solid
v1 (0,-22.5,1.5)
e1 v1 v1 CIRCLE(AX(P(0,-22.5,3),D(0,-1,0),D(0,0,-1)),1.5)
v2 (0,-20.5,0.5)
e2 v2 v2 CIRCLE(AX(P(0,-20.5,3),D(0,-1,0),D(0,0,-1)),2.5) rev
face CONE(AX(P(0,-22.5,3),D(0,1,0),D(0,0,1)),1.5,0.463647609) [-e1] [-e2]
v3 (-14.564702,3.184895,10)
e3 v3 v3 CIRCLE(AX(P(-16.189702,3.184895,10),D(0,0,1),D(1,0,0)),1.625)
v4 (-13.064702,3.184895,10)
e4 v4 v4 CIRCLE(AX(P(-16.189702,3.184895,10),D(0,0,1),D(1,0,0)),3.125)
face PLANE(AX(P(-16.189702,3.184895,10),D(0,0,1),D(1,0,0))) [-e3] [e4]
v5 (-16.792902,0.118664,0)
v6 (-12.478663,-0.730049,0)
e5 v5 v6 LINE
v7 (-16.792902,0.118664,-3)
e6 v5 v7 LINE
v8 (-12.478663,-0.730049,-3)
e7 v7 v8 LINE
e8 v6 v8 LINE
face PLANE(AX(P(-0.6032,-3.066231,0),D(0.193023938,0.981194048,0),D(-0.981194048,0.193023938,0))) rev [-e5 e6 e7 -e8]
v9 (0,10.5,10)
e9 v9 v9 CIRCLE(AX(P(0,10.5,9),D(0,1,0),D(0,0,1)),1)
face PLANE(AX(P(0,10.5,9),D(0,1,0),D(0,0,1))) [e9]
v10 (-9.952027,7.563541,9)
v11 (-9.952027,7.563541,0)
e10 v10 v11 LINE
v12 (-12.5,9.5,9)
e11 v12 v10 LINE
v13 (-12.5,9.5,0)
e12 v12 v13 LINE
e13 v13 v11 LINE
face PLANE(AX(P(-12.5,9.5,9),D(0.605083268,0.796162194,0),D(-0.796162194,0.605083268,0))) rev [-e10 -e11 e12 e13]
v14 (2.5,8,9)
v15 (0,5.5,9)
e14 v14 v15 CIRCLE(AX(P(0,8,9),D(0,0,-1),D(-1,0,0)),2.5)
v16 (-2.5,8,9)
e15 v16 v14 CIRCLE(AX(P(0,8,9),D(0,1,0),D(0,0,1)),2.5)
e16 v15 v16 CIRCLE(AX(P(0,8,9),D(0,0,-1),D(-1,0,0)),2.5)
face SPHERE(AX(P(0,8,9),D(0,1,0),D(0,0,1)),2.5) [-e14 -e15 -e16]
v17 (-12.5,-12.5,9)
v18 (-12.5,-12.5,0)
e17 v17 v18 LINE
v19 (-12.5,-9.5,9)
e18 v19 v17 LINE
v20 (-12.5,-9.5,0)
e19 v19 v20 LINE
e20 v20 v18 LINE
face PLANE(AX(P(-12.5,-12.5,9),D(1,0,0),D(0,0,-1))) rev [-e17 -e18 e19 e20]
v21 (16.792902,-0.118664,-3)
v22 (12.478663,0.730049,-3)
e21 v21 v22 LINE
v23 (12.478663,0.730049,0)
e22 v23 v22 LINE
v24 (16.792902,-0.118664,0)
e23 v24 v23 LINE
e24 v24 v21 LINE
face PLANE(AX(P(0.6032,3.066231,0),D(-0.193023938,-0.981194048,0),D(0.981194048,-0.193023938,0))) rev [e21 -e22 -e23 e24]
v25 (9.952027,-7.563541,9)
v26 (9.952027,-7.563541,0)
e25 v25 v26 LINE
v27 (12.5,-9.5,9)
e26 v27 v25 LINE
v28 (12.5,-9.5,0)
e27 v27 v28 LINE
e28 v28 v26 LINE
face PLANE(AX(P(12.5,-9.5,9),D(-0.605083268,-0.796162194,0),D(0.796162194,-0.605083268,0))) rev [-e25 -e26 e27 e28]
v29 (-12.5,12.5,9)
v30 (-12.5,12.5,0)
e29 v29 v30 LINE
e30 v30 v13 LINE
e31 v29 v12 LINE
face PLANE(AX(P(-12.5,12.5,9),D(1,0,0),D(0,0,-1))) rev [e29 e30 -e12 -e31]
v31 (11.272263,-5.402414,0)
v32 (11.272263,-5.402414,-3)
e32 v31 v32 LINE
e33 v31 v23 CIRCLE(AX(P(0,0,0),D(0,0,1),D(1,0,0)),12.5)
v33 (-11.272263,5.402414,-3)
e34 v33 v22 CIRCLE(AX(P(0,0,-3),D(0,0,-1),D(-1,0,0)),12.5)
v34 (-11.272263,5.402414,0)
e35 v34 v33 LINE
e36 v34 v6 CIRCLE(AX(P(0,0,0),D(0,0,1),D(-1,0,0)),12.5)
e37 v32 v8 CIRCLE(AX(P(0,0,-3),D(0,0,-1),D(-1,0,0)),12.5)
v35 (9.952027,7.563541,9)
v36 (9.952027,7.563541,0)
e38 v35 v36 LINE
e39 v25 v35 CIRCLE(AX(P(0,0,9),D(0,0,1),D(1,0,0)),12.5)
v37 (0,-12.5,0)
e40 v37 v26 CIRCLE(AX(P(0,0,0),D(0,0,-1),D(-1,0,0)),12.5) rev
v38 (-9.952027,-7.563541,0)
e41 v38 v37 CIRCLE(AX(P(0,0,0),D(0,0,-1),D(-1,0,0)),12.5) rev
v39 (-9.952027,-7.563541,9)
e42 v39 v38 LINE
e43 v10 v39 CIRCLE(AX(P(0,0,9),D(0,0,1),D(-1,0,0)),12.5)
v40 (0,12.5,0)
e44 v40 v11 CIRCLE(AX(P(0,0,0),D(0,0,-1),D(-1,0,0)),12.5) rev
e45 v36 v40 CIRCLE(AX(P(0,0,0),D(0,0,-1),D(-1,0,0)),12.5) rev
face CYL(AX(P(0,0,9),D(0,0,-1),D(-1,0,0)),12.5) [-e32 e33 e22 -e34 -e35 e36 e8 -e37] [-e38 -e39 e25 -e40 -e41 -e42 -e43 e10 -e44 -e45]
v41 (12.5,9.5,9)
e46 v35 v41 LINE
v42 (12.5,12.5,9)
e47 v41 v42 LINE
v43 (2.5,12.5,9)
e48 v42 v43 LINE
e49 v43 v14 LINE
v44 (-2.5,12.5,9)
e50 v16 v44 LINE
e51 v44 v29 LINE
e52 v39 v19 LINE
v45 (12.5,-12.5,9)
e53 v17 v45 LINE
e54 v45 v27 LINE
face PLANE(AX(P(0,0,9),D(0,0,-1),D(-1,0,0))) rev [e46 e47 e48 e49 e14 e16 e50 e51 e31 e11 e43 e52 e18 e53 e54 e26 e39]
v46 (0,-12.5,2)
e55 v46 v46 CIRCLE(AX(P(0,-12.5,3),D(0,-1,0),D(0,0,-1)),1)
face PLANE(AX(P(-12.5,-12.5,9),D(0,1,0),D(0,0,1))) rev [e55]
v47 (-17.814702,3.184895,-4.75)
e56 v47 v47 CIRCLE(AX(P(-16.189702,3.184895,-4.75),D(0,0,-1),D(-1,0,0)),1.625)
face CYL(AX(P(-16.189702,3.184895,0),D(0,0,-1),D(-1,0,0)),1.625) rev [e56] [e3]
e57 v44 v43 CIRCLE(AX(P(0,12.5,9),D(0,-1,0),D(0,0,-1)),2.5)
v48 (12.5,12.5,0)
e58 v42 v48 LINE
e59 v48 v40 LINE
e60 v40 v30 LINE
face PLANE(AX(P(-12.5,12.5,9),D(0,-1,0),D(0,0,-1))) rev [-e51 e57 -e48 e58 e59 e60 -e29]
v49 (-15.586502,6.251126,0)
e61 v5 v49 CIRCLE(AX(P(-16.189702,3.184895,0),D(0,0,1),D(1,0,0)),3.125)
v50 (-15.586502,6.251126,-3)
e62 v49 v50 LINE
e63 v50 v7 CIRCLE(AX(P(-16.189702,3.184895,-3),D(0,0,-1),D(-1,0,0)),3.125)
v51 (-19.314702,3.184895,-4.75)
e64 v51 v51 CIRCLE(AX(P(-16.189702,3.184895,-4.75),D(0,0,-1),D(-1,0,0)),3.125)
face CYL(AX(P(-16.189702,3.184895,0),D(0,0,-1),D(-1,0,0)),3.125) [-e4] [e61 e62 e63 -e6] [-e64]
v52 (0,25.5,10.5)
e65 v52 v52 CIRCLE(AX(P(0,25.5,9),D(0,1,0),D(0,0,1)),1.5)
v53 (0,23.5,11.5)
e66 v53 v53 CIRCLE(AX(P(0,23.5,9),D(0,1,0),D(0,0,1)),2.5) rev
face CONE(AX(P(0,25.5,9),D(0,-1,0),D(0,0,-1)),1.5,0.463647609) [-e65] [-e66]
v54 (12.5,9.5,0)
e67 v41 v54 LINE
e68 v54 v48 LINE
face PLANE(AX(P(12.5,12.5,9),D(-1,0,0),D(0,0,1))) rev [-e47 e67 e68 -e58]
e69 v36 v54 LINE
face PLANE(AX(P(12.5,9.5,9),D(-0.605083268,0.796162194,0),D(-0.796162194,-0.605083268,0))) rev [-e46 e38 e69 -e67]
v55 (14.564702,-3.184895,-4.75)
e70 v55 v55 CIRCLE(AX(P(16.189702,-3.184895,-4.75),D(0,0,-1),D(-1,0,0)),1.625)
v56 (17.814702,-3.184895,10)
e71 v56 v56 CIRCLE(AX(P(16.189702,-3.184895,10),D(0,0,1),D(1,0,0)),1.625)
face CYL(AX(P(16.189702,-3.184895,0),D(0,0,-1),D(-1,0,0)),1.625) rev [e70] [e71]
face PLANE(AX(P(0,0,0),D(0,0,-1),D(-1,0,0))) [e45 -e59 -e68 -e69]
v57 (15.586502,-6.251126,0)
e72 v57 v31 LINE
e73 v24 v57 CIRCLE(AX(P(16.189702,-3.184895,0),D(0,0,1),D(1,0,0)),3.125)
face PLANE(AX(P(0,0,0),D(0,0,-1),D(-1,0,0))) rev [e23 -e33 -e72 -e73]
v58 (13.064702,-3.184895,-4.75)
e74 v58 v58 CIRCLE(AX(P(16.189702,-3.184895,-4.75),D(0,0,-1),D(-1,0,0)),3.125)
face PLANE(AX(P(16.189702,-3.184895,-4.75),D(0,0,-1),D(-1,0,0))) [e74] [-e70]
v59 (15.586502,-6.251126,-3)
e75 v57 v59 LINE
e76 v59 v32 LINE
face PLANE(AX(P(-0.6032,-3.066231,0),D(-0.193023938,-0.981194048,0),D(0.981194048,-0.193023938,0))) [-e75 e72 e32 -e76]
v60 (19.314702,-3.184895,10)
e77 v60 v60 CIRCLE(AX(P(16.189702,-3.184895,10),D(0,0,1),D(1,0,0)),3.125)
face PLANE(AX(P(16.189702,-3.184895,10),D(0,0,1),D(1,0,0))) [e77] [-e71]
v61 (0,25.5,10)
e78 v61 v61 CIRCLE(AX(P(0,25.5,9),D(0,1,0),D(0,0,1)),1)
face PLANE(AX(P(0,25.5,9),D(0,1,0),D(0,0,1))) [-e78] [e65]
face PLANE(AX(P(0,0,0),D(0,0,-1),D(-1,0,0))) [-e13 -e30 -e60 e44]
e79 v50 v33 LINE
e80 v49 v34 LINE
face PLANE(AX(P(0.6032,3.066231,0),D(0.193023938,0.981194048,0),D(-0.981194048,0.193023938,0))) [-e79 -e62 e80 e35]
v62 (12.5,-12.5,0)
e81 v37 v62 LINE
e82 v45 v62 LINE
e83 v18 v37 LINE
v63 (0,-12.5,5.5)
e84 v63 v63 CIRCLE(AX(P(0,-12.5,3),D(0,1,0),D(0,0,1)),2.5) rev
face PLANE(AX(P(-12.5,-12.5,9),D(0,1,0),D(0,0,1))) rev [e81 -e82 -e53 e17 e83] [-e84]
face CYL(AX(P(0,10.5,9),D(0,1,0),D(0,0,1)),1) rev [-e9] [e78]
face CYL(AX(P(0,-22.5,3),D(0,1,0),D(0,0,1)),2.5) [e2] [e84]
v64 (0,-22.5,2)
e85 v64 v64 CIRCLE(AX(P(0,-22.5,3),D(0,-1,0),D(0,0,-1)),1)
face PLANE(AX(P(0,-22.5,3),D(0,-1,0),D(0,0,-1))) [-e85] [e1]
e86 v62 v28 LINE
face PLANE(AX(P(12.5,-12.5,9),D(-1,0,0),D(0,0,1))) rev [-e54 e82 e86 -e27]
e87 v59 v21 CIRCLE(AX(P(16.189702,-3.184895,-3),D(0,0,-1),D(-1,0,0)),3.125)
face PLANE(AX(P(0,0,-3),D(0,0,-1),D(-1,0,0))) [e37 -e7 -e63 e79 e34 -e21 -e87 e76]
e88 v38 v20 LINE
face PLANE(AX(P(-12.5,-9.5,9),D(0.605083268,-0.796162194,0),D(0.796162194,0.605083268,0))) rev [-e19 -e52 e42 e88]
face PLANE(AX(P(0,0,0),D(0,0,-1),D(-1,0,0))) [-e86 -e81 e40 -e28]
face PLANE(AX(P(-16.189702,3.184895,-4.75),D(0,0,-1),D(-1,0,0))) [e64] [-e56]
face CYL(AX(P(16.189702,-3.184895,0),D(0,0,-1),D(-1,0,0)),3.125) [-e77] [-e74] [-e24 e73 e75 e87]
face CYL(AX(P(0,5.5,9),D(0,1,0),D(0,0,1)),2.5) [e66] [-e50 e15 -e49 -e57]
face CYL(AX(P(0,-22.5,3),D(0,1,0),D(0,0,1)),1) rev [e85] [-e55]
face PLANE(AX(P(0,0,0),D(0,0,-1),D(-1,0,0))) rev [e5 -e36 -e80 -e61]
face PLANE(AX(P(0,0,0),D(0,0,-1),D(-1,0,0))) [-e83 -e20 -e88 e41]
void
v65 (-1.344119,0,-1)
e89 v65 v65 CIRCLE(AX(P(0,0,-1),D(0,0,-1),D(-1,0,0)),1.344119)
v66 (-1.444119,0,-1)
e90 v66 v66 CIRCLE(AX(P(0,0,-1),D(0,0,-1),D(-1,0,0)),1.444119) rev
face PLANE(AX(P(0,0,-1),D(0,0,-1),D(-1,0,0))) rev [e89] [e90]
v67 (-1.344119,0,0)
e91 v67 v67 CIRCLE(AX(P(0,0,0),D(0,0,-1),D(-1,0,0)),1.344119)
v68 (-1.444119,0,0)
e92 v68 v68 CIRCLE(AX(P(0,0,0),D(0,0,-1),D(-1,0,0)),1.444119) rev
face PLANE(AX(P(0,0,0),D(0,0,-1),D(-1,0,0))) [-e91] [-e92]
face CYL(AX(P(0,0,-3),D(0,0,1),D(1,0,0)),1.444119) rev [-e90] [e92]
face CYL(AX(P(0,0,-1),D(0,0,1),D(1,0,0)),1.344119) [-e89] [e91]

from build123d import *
from OCP.BRepFilletAPI import BRepFilletAPI_MakeChamfer
from build123d.topology import SkipClean

# Parameters (mm, degrees)
SALIENTE_EXTRUIR1_DEPTH      = 9
CROQUIS3_R                   = 1.344119186
SALIENTE_EXTRUIR2_DEPTH      = 1
CROQUIS4_R                   = 12.5
CROQUIS4_R_2                 = 1.444119186
SALIENTE_EXTRUIR3_DEPTH      = 3
CROQUIS5_R                   = 1.444119186
SALIENTE_EXTRUIR4_DEPTH      = 2
SALIENTE_EXTRUIR5_START      = -3
CROQUIS6_R                   = 1.625
SALIENTE_EXTRUIR5_DEPTH      = 3
CROQUIS7_R                   = 3.125
CROQUIS7_R_2                 = 1.625
SALIENTE_EXTRUIR6_DEPTH      = 1.75
CROQUIS8_R                   = 3.125
CROQUIS8_R_2                 = 1.625
SALIENTE_EXTRUIR7_DEPTH      = 10
SALIENTE_EXTRUIR8_DEPTH      = 13
SALIENTE_EXTRUIR8_DEPTH_BACK = 7
CROQUIS9_R                   = 2.5
REDONDEO1_R                  = 2.5
CROQUIS11_R                  = 2.5
CROQUIS11_R_2                = 1
SALIENTE_EXTRUIR9_DEPTH      = 10
CHAFL_N1_SIZE                = 2
CHAFL_N1_SIZE2               = 1
CROQUIS10_R                  = 1
CORTAR_EXTRUIR1_DEPTH        = 15


with BuildPart() as part:
    # Croquis2 → Saliente-Extruir1 (new body)
    with BuildSketch(Plane.XY):
        with BuildLine():
            Line((-12.5, 12.5), (12.5, 12.5))
            Line((12.5, 12.5), (12.5, 9.5))
            Line((12.5, 9.5), (9.952027427, 7.563540844))
            ThreePointArc((9.952027427, 7.563540844), (12.5, 0), (9.952027427, -7.563540844))
            Line((9.952027427, -7.563540844), (12.5, -9.5))
            Line((12.5, -9.5), (12.5, -12.5))
            Line((12.5, -12.5), (-12.5, -12.5))
            Line((-12.5, -12.5), (-12.5, -9.5))
            Line((-12.5, -9.5), (-9.952027427, -7.563540844))
            ThreePointArc((-9.952027427, -7.563540844), (-12.5, 0), (-9.952027427, 7.563540844))
            Line((-9.952027427, 7.563540844), (-12.5, 9.5))
            Line((-12.5, 9.5), (-12.5, 12.5))
        make_face()
    extrude(amount=SALIENTE_EXTRUIR1_DEPTH)

    # Croquis3 → Saliente-Extruir2 (add)
    with BuildSketch(Plane(origin=(0, 0, 0), x_dir=(-1, 0, 0), z_dir=(0, 0, -1))):
        Circle(CROQUIS3_R)
    extrude(amount=SALIENTE_EXTRUIR2_DEPTH)



with BuildPart() as body_2:
    # Croquis4 → Saliente-Extruir3 (new body)
    with BuildSketch(Plane(origin=(0, 0, 0), x_dir=(-1, 0, 0), z_dir=(0, 0, -1))):
        Circle(CROQUIS4_R)
        Circle(CROQUIS4_R_2, mode=Mode.SUBTRACT)
    extrude(amount=SALIENTE_EXTRUIR3_DEPTH)

    # Croquis5 → Saliente-Extruir4 (add)
    with BuildSketch(Plane(origin=(0, 0, -3), x_dir=(-1, 0, 0), z_dir=(0, 0, -1))):
        Circle(CROQUIS5_R)
    extrude(amount=-SALIENTE_EXTRUIR4_DEPTH)

    # Croquis6 → Saliente-Extruir5 (add)
    # profile 1 of 2: a face of its own
    with BuildSketch(Plane(origin=(0, 0, -3), x_dir=(-1, 0, 0), z_dir=(0, 0, -1)).offset(SALIENTE_EXTRUIR5_START)):
        with BuildLine():
            Line((-12.478662951, 0.73004859), (-16.792901594, -0.118663584))
            ThreePointArc((-16.792901594, -0.118663584), (-19.255933186, -3.788094791), (-15.586501979, -6.251126382))
            Line((-15.586501979, -6.251126382), (-11.272263337, -5.402414208))
            ThreePointArc((-11.272263337, -5.402414208), (-12.264925596, -2.41279923), (-12.478662951, 0.73004859))
        make_face()
        with Locations((-16.189701787, -3.184894983)):
            Circle(CROQUIS6_R, mode=Mode.SUBTRACT)
    # profile 2 of 2: a face of its own
    with BuildSketch(Plane(origin=(0, 0, -3), x_dir=(-1, 0, 0), z_dir=(0, 0, -1)).offset(SALIENTE_EXTRUIR5_START)):
        with BuildLine():
            Line((15.586501979, 6.251126382), (11.272263337, 5.402414208))
            ThreePointArc((11.272263337, 5.402414208), (12.264925596, 2.41279923), (12.478662951, -0.73004859))
            Line((12.478662951, -0.73004859), (16.792901594, 0.118663584))
            ThreePointArc((16.792901594, 0.118663584), (19.255933186, 3.788094791), (15.586501979, 6.251126382))
        make_face()
        with Locations((16.189701787, 3.184894983)):
            Circle(CROQUIS6_R, mode=Mode.SUBTRACT)
    extrude(amount=SALIENTE_EXTRUIR5_DEPTH)

    # Croquis7 → Saliente-Extruir6 (add)
    # profile 1 of 2: a face of its own
    with BuildSketch(Plane(origin=(0, 0, -3), x_dir=(-1, 0, 0), z_dir=(0, 0, -1))):
        with Locations((-16.189701787, -3.184894983)):
            Circle(CROQUIS7_R)
        with Locations((-16.189701787, -3.184894983)):
            Circle(CROQUIS7_R_2, mode=Mode.SUBTRACT)
    # profile 2 of 2: a face of its own
    with BuildSketch(Plane(origin=(0, 0, -3), x_dir=(-1, 0, 0), z_dir=(0, 0, -1))):
        with Locations((16.189701787, 3.184894983)):
            Circle(CROQUIS7_R)
        with Locations((16.189701787, 3.184894983)):
            Circle(CROQUIS7_R_2, mode=Mode.SUBTRACT)
    extrude(amount=SALIENTE_EXTRUIR6_DEPTH)

    # Croquis8 → Saliente-Extruir7 (add)
    # profile 1 of 2: a face of its own
    with SkipClean():  # the faces are left unmerged after this step: merging them gives an invalid solid
        with BuildSketch(Plane.XY):
            with Locations(Location((-16.189701787, 3.184894983, 0), (0, 0, 180))):
                Circle(CROQUIS8_R)
            with Locations(Location((-16.189701787, 3.184894983, 0), (0, 0, 180))):
                Circle(CROQUIS8_R_2, mode=Mode.SUBTRACT)
        # profile 2 of 2: a face of its own
        with BuildSketch(Plane.XY):
            with Locations(Location((16.189701787, -3.184894983, 0), (0, 0, 180))):
                Circle(CROQUIS8_R)
            with Locations(Location((16.189701787, -3.184894983, 0), (0, 0, 180))):
                Circle(CROQUIS8_R_2, mode=Mode.SUBTRACT)
        extrude(amount=SALIENTE_EXTRUIR7_DEPTH)


with BuildPart() as part_1:
    add(part.part)

    add(body_2.part)  # Saliente-Extruir8 merges body 2
    # Croquis9 → Saliente-Extruir8 (add, two sides: drawn at the far end of the back side and taken through both)
    with BuildSketch(Plane(origin=(0, 12.5, 0), x_dir=(1, 0, 0), z_dir=(0, 1, 0)).offset(-SALIENTE_EXTRUIR8_DEPTH_BACK)):
        with Locations(Location((0, -9, 0), (0, 0, 270))):
            Circle(CROQUIS9_R)
    extrude(amount=SALIENTE_EXTRUIR8_DEPTH + SALIENTE_EXTRUIR8_DEPTH_BACK)

    # Redondeo1
    redondeo1_edges = [part_1.edges().sort_by_distance(p)[0] for p in [
        (1.767766953, 5.5, 10.767766953),
    ]]
    fillet(redondeo1_edges, radius=REDONDEO1_R - 0.0001)  # a hair under: the kernel refuses the full size

    # Croquis11 → Saliente-Extruir9 (add)
    with BuildSketch(Plane.XZ.offset(12.5)):
        with Locations(Location((0, 3, 0), (0, 0, 90))):
            Circle(CROQUIS11_R)
        with Locations(Location((0, 3, 0), (0, 0, 270))):
            Circle(CROQUIS11_R_2, mode=Mode.SUBTRACT)
    extrude(amount=SALIENTE_EXTRUIR9_DEPTH)

    # Chaflán1: one chamfer whose edges measure the first distance from different faces: ONE call of the kernel's chamfer builder (chamfer() names one face for all edges)
    chafl_n1_edges_1 = [part_1.edges().sort_by_distance(p)[0] for p in [
        (0, 25.5, 6.5),
    ]]
    chafl_n1_side_1 = [part_1.faces().sort_by_distance(p)[0] for p in [
        (0, 19, 6.5),
    ]]
    chafl_n1_edges_2 = [part_1.edges().sort_by_distance(p)[0] for p in [
        (0, -22.5, 0.5),
    ]]
    chafl_n1_side_2 = [part_1.faces().sort_by_distance(p)[0] for p in [
        (0, -17.5, 0.5),
    ]]
    chafl_n1 = BRepFilletAPI_MakeChamfer(part_1.part.solid().wrapped)
    for e in chafl_n1_edges_1:
        chafl_n1.Add(CHAFL_N1_SIZE, CHAFL_N1_SIZE2, e.wrapped, chafl_n1_side_1[0].wrapped)  # the first distance lies on this face
    for e in chafl_n1_edges_2:
        chafl_n1.Add(CHAFL_N1_SIZE, CHAFL_N1_SIZE2, e.wrapped, chafl_n1_side_2[0].wrapped)  # the first distance lies on this face
    add(Compound.cast(chafl_n1.Shape()), mode=Mode.REPLACE)

    # Croquis10 → Cortar-Extruir1 (cut)
    with BuildSketch(Plane(origin=(0, 25.5, 0), x_dir=(1, 0, 0), z_dir=(0, 1, 0))):
        with Locations(Location((0, -9, 0), (0, 0, 270))):
            Circle(CROQUIS10_R)
    extrude(amount=-CORTAR_EXTRUIR1_DEPTH, mode=Mode.SUBTRACT)


solid = part_1.part
